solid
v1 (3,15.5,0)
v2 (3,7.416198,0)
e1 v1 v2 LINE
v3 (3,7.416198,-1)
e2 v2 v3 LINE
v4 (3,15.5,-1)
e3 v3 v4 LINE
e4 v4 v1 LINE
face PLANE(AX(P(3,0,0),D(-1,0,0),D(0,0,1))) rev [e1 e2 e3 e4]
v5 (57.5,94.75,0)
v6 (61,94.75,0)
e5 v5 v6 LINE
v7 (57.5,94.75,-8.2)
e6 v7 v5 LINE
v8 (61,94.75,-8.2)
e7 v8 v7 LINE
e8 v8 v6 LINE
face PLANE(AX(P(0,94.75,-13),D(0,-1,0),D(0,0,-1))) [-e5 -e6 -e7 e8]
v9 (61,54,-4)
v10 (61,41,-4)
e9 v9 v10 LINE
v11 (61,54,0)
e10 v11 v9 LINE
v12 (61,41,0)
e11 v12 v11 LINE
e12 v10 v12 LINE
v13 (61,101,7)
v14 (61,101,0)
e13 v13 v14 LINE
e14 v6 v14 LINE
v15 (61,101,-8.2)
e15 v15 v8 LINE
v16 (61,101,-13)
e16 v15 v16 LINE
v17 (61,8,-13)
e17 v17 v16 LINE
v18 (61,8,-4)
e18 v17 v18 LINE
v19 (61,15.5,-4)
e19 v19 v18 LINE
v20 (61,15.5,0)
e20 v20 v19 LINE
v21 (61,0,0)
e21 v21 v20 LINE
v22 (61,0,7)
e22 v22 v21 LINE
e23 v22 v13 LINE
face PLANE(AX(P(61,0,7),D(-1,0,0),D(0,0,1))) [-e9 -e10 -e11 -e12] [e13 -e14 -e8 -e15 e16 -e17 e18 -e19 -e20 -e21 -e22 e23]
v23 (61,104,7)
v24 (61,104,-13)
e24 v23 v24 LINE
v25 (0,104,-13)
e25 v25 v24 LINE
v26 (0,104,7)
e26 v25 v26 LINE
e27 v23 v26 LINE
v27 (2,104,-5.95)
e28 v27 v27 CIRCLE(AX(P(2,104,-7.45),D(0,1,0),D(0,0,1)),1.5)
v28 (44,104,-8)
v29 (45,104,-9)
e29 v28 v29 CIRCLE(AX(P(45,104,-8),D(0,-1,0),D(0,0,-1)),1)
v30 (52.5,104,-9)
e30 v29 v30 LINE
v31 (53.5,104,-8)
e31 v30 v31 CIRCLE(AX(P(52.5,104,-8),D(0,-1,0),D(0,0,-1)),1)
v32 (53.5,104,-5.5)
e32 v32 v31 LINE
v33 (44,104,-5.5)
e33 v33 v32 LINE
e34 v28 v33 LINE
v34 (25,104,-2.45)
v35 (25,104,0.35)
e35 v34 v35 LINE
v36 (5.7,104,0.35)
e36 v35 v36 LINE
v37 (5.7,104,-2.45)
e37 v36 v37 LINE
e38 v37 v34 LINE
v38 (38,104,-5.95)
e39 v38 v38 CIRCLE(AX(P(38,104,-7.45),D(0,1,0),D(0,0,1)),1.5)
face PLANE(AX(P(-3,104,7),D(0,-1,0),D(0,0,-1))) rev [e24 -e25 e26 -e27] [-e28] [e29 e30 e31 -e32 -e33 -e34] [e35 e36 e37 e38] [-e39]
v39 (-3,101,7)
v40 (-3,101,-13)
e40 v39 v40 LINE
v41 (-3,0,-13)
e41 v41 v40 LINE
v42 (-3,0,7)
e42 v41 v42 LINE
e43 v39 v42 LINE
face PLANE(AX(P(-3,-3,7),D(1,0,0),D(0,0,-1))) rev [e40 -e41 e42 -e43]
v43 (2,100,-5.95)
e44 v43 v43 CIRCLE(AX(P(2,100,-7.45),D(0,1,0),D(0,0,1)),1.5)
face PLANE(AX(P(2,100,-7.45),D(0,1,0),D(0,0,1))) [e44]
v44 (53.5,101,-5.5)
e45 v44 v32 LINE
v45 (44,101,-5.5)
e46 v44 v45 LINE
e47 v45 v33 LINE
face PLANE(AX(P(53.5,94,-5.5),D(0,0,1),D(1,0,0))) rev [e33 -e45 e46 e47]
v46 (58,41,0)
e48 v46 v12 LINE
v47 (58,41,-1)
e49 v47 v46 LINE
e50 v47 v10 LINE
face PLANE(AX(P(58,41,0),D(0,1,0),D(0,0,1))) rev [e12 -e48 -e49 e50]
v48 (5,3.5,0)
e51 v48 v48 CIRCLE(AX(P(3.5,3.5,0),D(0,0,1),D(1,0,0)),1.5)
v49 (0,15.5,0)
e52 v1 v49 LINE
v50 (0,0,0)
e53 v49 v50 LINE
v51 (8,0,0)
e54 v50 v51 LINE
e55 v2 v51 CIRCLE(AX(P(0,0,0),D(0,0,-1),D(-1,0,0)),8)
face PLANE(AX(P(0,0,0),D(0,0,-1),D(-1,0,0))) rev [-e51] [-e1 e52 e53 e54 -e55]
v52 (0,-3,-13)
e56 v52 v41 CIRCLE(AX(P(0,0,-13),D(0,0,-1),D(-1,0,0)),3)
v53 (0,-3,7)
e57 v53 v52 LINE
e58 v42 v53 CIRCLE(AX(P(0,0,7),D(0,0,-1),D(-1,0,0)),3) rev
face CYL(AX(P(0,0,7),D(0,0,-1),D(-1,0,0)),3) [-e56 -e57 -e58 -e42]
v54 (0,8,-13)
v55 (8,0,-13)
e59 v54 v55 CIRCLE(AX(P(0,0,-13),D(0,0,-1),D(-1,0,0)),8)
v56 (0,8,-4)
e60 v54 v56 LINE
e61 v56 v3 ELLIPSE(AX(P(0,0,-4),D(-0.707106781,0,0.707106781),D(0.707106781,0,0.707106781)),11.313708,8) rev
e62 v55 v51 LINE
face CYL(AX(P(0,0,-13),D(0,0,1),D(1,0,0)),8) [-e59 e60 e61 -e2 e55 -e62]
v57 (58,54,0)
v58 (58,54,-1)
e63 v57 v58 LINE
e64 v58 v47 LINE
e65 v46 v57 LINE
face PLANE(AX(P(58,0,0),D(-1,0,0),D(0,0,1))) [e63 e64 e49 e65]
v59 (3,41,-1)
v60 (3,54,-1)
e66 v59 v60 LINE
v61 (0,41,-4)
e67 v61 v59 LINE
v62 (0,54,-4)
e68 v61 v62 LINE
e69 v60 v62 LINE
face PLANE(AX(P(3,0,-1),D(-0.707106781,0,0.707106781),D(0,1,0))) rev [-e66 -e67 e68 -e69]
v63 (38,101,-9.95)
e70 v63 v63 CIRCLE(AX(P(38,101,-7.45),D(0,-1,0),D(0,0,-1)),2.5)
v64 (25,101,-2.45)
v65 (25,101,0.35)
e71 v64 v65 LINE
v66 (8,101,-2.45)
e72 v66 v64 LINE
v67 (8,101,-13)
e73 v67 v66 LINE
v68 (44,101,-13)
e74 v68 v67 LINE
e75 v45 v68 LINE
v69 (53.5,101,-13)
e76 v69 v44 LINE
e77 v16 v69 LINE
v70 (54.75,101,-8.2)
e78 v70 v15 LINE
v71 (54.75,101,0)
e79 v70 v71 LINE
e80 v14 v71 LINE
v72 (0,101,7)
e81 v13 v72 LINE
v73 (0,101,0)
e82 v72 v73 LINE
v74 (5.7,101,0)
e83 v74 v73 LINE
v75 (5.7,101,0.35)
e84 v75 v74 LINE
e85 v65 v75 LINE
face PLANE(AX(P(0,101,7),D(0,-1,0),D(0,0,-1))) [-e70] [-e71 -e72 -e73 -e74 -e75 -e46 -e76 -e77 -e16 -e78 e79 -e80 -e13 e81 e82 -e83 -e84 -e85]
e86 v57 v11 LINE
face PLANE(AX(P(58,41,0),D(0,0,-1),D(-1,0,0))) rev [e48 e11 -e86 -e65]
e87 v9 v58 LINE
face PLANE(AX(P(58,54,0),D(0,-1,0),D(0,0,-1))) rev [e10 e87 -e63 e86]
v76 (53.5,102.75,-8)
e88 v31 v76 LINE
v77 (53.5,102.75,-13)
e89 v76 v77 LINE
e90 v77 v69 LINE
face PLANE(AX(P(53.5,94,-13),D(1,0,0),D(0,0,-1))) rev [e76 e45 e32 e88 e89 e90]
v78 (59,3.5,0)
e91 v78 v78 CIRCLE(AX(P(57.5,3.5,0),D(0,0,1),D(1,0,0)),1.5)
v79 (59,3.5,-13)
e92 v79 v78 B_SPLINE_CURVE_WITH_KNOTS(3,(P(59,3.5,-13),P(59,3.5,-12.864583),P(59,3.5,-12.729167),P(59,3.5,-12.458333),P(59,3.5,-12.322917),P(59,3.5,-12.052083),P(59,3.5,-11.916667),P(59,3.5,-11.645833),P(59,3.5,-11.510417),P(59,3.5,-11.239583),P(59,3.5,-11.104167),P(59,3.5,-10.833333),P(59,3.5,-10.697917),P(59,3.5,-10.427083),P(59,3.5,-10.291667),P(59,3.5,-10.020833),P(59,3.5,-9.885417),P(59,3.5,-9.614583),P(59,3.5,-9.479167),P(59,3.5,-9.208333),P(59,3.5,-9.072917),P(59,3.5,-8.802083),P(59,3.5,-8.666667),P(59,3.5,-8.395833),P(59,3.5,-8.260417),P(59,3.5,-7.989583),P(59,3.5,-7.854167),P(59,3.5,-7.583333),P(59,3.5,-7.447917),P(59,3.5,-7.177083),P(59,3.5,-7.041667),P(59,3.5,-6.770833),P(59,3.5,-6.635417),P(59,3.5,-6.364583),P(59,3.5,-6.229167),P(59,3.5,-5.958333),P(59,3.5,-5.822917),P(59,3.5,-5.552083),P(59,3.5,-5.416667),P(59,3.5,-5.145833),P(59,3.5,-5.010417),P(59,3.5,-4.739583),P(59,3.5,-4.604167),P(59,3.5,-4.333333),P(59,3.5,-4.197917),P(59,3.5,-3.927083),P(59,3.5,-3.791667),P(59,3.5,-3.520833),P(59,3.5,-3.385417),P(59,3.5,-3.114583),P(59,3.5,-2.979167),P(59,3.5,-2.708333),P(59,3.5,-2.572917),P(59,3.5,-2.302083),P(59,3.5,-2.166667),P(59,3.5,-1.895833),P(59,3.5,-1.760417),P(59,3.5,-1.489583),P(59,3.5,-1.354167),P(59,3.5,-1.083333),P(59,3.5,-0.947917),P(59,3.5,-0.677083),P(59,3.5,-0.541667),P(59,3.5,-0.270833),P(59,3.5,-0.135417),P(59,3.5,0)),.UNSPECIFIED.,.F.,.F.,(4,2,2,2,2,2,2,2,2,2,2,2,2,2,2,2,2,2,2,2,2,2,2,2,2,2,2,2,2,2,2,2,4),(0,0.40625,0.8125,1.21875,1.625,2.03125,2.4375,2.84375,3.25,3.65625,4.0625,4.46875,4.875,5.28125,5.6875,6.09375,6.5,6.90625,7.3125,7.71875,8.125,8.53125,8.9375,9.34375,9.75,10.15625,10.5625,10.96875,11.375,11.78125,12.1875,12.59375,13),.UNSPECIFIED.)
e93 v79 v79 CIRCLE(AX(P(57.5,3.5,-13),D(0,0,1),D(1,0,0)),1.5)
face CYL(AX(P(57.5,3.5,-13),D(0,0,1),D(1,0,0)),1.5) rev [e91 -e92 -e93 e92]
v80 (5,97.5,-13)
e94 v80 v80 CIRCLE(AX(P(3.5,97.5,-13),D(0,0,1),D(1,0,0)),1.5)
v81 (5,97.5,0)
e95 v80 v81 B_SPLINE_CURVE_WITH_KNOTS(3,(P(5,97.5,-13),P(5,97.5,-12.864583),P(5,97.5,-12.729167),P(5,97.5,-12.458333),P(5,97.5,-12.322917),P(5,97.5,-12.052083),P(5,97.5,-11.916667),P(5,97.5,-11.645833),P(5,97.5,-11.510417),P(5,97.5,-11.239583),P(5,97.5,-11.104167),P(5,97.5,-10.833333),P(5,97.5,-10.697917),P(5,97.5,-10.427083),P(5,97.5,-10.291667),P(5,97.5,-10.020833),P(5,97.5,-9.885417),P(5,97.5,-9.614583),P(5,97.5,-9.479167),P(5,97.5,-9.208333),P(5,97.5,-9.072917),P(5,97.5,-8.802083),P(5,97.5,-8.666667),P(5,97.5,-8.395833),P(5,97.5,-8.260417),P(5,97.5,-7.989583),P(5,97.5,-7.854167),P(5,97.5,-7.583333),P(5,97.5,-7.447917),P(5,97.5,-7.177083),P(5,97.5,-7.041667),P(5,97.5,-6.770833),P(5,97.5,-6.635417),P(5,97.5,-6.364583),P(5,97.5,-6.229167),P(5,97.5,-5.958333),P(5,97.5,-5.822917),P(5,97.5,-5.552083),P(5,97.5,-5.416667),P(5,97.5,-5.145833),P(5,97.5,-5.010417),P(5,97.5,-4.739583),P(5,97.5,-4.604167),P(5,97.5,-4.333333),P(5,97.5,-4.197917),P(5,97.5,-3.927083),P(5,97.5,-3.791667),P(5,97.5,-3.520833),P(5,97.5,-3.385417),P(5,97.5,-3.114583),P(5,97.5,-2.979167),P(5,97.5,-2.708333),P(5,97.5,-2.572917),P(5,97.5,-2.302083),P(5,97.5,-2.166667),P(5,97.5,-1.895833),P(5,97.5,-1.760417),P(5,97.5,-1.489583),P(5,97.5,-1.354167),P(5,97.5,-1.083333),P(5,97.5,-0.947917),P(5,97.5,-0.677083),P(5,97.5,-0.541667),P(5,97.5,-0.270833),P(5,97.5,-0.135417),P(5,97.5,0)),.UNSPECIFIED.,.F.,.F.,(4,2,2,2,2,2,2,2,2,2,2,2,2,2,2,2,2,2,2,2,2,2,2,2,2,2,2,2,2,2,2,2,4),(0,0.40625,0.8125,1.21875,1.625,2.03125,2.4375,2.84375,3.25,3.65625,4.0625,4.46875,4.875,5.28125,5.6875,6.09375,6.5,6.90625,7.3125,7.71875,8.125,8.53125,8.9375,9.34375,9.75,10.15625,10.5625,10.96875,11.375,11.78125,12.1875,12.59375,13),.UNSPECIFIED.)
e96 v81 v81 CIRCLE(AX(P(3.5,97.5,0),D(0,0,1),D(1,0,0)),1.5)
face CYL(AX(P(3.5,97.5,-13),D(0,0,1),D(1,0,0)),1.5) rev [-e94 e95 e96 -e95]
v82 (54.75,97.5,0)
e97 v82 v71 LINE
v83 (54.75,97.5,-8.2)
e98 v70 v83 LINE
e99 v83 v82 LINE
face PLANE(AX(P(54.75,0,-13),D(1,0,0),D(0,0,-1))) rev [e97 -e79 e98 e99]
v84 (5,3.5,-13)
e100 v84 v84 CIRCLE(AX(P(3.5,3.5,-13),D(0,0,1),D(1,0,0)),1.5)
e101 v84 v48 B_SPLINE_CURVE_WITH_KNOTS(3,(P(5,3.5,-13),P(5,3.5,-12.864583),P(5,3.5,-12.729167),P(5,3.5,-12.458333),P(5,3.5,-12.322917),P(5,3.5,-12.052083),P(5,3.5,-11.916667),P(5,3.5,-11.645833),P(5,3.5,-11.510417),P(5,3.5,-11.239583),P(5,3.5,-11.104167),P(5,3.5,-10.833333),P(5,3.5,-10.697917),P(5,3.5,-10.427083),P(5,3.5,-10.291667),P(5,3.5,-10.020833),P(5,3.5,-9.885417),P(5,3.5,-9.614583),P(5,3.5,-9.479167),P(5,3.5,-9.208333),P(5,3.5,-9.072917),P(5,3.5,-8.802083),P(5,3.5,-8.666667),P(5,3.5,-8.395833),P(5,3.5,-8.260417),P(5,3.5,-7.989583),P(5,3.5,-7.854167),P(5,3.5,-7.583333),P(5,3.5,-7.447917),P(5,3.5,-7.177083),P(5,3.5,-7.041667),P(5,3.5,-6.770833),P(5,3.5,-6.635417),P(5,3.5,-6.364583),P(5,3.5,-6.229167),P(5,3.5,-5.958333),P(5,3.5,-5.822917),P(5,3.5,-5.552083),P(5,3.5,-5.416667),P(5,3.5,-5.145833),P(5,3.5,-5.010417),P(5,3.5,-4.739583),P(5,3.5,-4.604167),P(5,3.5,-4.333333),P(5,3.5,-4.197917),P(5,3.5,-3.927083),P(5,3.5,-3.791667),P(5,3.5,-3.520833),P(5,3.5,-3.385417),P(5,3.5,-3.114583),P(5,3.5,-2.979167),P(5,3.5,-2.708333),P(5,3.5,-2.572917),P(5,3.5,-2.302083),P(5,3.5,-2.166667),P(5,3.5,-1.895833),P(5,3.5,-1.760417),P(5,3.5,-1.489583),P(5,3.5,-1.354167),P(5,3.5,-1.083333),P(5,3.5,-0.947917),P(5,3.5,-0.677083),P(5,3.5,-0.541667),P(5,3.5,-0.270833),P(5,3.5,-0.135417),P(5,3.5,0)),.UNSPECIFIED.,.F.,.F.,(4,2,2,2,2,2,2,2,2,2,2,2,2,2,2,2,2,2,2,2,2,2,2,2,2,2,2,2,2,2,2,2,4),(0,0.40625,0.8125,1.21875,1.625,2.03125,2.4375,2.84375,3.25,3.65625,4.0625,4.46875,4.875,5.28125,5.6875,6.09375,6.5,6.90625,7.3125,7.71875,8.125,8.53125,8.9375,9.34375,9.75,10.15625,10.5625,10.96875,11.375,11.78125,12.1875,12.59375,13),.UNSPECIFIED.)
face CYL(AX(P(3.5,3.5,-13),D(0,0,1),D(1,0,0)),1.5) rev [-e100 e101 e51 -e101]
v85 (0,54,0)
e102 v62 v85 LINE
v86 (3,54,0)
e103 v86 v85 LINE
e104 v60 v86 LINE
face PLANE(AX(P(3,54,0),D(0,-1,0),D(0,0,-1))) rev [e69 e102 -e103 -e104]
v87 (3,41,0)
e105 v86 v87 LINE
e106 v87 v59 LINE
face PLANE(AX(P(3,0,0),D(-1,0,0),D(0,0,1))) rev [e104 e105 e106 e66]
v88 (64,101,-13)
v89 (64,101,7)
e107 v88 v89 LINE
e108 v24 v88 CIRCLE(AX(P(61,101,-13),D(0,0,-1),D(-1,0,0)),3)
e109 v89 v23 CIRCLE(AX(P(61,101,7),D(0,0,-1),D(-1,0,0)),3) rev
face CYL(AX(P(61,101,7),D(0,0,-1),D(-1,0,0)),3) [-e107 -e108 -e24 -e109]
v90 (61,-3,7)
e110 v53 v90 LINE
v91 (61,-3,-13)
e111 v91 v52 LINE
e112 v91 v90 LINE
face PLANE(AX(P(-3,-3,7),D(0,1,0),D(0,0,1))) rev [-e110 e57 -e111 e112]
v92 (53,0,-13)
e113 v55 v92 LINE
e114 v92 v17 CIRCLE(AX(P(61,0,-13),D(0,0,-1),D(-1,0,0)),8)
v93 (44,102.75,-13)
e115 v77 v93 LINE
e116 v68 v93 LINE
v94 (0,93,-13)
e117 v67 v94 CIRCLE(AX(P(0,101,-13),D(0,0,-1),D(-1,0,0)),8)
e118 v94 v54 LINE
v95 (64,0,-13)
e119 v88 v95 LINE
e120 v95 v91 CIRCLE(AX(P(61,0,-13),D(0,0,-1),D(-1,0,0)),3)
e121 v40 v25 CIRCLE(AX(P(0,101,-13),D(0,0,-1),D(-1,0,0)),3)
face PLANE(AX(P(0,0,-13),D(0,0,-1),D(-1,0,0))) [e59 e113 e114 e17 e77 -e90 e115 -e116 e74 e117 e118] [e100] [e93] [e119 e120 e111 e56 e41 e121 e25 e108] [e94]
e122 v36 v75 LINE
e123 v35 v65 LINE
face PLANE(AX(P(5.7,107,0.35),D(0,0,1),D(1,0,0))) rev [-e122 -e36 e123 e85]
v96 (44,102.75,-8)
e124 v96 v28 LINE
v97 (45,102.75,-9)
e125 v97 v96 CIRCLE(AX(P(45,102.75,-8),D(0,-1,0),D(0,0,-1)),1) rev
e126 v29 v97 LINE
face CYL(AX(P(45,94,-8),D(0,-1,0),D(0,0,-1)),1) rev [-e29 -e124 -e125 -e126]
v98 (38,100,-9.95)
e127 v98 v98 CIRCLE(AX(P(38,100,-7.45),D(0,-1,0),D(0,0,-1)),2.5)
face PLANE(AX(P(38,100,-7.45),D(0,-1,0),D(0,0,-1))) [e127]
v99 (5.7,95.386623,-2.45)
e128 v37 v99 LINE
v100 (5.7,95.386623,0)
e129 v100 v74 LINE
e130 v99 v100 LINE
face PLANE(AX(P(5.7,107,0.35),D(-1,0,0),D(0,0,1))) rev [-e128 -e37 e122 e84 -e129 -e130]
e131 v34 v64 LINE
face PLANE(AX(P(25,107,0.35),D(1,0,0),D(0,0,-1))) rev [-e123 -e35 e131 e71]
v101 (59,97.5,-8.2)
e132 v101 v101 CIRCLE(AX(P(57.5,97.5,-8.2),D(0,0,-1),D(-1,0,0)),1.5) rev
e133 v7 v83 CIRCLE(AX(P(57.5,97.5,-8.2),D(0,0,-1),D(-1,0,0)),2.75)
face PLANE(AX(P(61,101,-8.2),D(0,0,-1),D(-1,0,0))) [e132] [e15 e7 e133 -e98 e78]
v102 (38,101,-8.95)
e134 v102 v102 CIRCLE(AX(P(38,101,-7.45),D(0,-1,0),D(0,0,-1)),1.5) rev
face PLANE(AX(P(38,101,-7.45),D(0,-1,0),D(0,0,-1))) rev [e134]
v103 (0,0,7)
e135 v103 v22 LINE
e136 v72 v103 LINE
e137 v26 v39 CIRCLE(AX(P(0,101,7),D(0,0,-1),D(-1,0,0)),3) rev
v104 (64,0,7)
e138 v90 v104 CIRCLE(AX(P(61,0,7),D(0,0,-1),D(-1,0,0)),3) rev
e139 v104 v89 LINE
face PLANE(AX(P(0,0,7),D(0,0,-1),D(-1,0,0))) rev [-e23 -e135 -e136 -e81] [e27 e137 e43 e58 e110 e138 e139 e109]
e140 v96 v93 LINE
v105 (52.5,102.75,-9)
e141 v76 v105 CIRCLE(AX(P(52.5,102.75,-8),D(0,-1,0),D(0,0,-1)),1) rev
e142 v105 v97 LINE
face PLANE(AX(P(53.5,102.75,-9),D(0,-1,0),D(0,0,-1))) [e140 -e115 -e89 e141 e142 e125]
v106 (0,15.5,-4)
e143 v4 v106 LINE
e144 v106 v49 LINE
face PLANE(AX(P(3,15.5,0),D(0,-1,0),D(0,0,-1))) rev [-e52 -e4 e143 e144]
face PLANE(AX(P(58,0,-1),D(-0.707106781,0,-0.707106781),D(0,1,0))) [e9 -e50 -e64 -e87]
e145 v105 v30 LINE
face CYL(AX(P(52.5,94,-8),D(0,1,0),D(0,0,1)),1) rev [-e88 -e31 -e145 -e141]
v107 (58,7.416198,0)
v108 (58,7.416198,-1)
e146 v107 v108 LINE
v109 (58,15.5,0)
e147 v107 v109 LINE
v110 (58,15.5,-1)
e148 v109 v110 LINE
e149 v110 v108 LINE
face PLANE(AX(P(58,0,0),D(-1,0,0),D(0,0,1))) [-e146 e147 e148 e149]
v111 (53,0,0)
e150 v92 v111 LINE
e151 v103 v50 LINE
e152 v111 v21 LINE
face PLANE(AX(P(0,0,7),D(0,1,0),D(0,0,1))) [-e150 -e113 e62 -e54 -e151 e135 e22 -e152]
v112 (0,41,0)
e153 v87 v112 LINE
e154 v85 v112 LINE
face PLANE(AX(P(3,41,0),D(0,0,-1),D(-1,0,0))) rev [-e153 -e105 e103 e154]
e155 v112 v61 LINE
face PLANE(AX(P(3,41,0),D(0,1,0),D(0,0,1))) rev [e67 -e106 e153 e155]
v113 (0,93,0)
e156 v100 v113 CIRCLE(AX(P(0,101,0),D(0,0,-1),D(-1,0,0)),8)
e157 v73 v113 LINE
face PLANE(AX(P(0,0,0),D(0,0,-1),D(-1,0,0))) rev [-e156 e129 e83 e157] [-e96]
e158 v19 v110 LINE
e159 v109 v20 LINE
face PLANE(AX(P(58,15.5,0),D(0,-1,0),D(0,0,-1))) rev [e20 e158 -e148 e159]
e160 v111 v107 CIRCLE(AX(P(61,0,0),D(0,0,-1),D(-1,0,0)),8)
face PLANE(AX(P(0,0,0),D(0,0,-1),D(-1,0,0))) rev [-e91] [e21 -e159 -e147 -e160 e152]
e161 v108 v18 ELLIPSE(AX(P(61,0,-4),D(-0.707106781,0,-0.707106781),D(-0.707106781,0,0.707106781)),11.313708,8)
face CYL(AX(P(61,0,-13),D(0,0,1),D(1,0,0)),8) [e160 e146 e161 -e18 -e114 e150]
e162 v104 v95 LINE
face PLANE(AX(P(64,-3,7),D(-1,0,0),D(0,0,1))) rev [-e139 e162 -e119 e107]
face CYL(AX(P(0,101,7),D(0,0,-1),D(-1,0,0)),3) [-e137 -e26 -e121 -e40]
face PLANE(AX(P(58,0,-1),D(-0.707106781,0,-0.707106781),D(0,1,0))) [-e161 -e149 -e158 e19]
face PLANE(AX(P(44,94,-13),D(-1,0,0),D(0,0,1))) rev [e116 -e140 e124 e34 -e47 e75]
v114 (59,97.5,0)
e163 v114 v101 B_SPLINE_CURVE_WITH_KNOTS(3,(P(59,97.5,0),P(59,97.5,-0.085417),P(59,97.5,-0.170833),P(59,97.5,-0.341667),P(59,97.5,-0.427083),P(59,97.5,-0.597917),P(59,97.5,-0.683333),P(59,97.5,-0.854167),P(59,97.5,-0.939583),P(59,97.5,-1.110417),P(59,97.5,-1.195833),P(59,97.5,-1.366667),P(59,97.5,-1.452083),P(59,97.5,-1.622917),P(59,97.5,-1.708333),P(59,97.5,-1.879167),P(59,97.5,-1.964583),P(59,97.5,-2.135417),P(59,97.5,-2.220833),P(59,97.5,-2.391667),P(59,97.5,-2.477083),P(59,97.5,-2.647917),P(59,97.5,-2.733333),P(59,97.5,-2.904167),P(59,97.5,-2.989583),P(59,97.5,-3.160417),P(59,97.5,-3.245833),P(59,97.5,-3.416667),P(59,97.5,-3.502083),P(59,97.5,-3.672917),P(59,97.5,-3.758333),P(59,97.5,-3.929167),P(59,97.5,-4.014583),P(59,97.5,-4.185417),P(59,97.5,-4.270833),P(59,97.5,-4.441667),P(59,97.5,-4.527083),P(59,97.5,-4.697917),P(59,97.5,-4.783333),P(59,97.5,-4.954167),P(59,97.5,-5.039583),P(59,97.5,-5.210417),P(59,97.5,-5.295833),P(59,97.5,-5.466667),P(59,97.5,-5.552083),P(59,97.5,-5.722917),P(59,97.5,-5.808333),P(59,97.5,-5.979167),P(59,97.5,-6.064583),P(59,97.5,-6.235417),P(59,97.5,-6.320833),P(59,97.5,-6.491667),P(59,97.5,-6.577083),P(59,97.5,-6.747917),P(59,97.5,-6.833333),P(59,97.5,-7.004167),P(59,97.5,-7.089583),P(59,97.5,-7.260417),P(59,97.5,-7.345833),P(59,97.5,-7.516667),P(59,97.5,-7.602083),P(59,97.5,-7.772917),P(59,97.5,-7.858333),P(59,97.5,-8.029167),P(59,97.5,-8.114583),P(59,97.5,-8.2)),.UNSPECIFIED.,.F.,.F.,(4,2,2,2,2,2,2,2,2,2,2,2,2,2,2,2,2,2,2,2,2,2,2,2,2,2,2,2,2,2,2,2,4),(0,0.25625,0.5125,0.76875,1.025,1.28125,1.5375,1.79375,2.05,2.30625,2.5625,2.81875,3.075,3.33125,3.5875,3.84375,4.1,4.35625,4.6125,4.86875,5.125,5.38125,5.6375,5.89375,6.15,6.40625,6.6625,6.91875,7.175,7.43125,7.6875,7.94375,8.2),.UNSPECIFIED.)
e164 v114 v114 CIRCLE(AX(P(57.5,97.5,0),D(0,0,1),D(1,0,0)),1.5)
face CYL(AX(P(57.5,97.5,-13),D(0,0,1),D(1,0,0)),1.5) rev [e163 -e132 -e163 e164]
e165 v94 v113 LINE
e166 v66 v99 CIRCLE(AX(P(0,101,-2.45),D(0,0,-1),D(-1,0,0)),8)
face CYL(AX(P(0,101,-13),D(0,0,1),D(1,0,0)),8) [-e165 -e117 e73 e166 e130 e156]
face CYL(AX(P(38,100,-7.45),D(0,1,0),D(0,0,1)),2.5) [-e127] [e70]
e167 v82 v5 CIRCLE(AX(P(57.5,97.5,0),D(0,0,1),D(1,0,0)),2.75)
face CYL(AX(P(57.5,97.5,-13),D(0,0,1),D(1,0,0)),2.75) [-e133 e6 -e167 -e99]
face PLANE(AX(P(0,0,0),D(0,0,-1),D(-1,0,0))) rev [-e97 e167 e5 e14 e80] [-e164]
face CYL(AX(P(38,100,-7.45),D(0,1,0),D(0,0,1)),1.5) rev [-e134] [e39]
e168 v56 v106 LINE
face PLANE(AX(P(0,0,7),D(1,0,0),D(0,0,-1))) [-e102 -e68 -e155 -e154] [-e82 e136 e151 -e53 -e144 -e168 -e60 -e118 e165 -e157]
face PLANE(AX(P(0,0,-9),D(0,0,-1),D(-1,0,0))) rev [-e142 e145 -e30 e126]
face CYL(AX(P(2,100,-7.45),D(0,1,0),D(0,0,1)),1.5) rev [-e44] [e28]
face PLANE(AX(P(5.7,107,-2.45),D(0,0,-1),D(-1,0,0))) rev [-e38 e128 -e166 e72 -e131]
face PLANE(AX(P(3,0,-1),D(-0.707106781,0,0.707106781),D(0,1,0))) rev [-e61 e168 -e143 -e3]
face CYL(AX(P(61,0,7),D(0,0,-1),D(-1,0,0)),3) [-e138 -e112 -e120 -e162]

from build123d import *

# Parameters (mm, degrees)
SKICA1_W                 = 67
SKICA1_H                 = 107
SKICA1_W_2               = 61
SKICA1_H_2               = 101
P_IDAT_VYSUNUT_M1_DEPTH  = 7
P_IDAT_VYSUNUT_M2_DEPTH  = 13
SKICA3_R                 = 1.5
ODEBRAT_VYSUNUT_M1_DEPTH = 13
ODEBRAT_START            = -4.8
ODEBRAT_VYSUNUT_M2_DEPTH = 4.8
ODEBRAT_VYSUNUT_M4_DEPTH = 123.804723036
ZAOBLIT1_R               = 3
SKICA5_W                 = 4
SKICA5_H                 = 8.5
SKICA5_H_2               = 13
P_IDAT_VYSUNUT_M3_DEPTH  = 3
ZKOSEN_1_SIZE            = 3
SKICA6_W                 = 4
SKICA6_H                 = 8.5
SKICA6_H_2               = 13
P_IDAT_VYSUNUT_M4_DEPTH  = 3
ZKOSEN_2_SIZE            = 3
SKICA7_W                 = 9.5
SKICA7_H                 = 7.5
ODEBRAT_VYSUNUT_M3_DEPTH = 10
SKICA9_W                 = 9.5
SKICA9_H                 = 1.25
P_IDAT_VYSUNUT_M5_DEPTH  = 4
ZAOBLIT2_R               = 1
SKICA10_W                = 19.3
SKICA10_H                = 2.8
ODEBRAT_VYSUNUT_M5_DEPTH = 6
SKICA11_R                = 1.5
ODEBRAT_VYSUNUT_M6_DEPTH = 4
SKICA13_R                = 2.5
P_IDAT_VYSUNUT_M6_DEPTH  = 1


with BuildPart() as part:
    # Skica1 → Přidat vysunutím1 (new body)
    with BuildSketch(Plane.XY):
        with Locations((30.5, 50.5)):
            Rectangle(SKICA1_W, SKICA1_H)
        with Locations((30.5, 50.5)):
            Rectangle(SKICA1_W_2, SKICA1_H_2, mode=Mode.SUBTRACT)
    extrude(amount=P_IDAT_VYSUNUT_M1_DEPTH)

    # Skica2 → Přidat vysunutím2 (add)
    with BuildSketch(Plane(origin=(0, 0, 0), x_dir=(-1, 0, 0), z_dir=(0, 0, -1))):
        with BuildLine():
            ThreePointArc((-53, 0), (-53.14730658, -1.5281381), (-53.583801513, -3))
            Line((-53.583801513, -3), (-7.416198487, -3))
            ThreePointArc((-7.416198487, -3), (-7.85269342, -1.5281381), (-8, 0))
            Line((-8, 0), (-53, 0))
        make_face()
        with BuildLine():
            ThreePointArc((-61, 8), (-62.5281381, 7.85269342), (-64, 7.416198487))
            Line((-64, 7.416198487), (-64, -3))
            Line((-64, -3), (-53.583801513, -3))
            ThreePointArc((-53.583801513, -3), (-53.14730658, -1.5281381), (-53, 0))
            Line((-53, 0), (-61, 0))
            Line((-61, 0), (-61, 8))
        make_face()
        with BuildLine():
            ThreePointArc((-53, 0), (-55.343145751, 5.656854249), (-61, 8))
            Line((-61, 8), (-61, 0))
            Line((-61, 0), (-53, 0))
        make_face()
        with BuildLine():
            ThreePointArc((-61, 93), (-62.5281381, 93.14730658), (-64, 93.583801513))
            Line((-64, 93.583801513), (-64, 7.416198487))
            ThreePointArc((-64, 7.416198487), (-62.5281381, 7.85269342), (-61, 8))
            Line((-61, 8), (-61, 93))
        make_face()
        with BuildLine():
            Line((-53.583801513, 104), (-64, 104))
            Line((-64, 104), (-64, 93.583801513))
            ThreePointArc((-64, 93.583801513), (-62.5281381, 93.14730658), (-61, 93))
            Line((-61, 93), (-61, 101))
            Line((-61, 101), (-53, 101))
            ThreePointArc((-53, 101), (-53.14730658, 102.5281381), (-53.583801513, 104))
        make_face()
        with BuildLine():
            ThreePointArc((-61, 93), (-55.343145751, 95.343145751), (-53, 101))
            Line((-53, 101), (-61, 101))
            Line((-61, 101), (-61, 93))
        make_face()
        with BuildLine():
            Line((-7.416198487, 104), (-53.583801513, 104))
            ThreePointArc((-53.583801513, 104), (-53.14730658, 102.5281381), (-53, 101))
            Line((-53, 101), (-8, 101))
            ThreePointArc((-8, 101), (-7.85269342, 102.5281381), (-7.416198487, 104))
        make_face()
        with BuildLine():
            Line((3, 104), (-7.416198487, 104))
            ThreePointArc((-7.416198487, 104), (-7.85269342, 102.5281381), (-8, 101))
            Line((-8, 101), (0, 101))
            Line((0, 101), (0, 93))
            ThreePointArc((0, 93), (1.5281381, 93.14730658), (3, 93.583801513))
            Line((3, 93.583801513), (3, 104))
        make_face()
        with BuildLine():
            Line((0, 101), (-8, 101))
            ThreePointArc((-8, 101), (-5.656854249, 95.343145751), (0, 93))
            Line((0, 93), (0, 101))
        make_face()
        with BuildLine():
            Line((3, 7.416198487), (3, 93.583801513))
            ThreePointArc((3, 93.583801513), (1.5281381, 93.14730658), (0, 93))
            Line((0, 93), (0, 8))
            ThreePointArc((0, 8), (1.5281381, 7.85269342), (3, 7.416198487))
        make_face()
        with BuildLine():
            Line((3, -3), (3, 7.416198487))
            ThreePointArc((3, 7.416198487), (1.5281381, 7.85269342), (0, 8))
            Line((0, 8), (0, 0))
            Line((0, 0), (-8, 0))
            ThreePointArc((-8, 0), (-7.85269342, -1.5281381), (-7.416198487, -3))
            Line((-7.416198487, -3), (3, -3))
        make_face()
        with BuildLine():
            Line((0, 0), (0, 8))
            ThreePointArc((0, 8), (-5.656854249, 5.656854249), (-8, 0))
            Line((-8, 0), (0, 0))
        make_face()
    extrude(amount=P_IDAT_VYSUNUT_M2_DEPTH)

    # Skica3 → Odebrat vysunutím1 (cut)
    with BuildSketch(Plane.XY):
        with Locations((3.5, 97.5)):
            Circle(SKICA3_R)
        with Locations((3.5, 3.5)):
            Circle(SKICA3_R)
        with Locations((57.5, 3.5)):
            Circle(SKICA3_R)
        with Locations((57.5, 97.5)):
            Circle(SKICA3_R)
    extrude(amount=-ODEBRAT_VYSUNUT_M1_DEPTH, mode=Mode.SUBTRACT)

    # Skica4 → Odebrat vysunutím2 (cut)
    with BuildSketch(Plane(origin=(0, 0, -13), x_dir=(-1, 0, 0), z_dir=(0, 0, -1)).offset(ODEBRAT_START)):
        with BuildLine():
            Line((-53, 101), (-61, 101))
            Line((-61, 101), (-61, 93))
            ThreePointArc((-61, 93), (-55.343145751, 95.343145751), (-53, 101))
        make_face()
    extrude(amount=ODEBRAT_VYSUNUT_M2_DEPTH, mode=Mode.SUBTRACT)

    # Skica8 → Odebrat vysunutím4 (cut, through all)
    with BuildSketch(Plane.XY):
        with BuildLine():
            Line((61, 94.75), (57.5, 94.75))
            ThreePointArc((57.5, 94.75), (55.555456352, 95.555456352), (54.75, 97.5))
            Line((54.75, 97.5), (54.75, 101))
            Line((54.75, 101), (53, 101))
            ThreePointArc((53, 101), (55.343145751, 95.343145751), (61, 93))
            Line((61, 93), (61, 94.75))
        make_face()
    extrude(amount=-ODEBRAT_VYSUNUT_M4_DEPTH, mode=Mode.SUBTRACT)

    # Zaoblit1
    zaoblit1_edges = [part.edges().sort_by_distance(p)[0] for p in [
        (-3, 104, -3),
        (64, 104, -3),
        (64, -3, -3),
        (-3, -3, -3),
    ]]
    fillet(zaoblit1_edges, radius=ZAOBLIT1_R)

    # Skica5 → Přidat vysunutím3 (add)
    with BuildSketch(Plane(origin=(0, 0, 0), x_dir=(0, 0, -1), z_dir=(1, 0, 0))):
        with Locations((2, 11.25)):
            Rectangle(SKICA5_W, SKICA5_H)
        with Locations((2, 47.5)):
            Rectangle(SKICA5_W, SKICA5_H_2)
    extrude(amount=P_IDAT_VYSUNUT_M3_DEPTH)

    # Zkosení1
    zkosen_1_edges = [part.edges().sort_by_distance(p)[0] for p in [
        (3, 11.458099244, -4),
        (3, 47.5, -4),
    ]]
    chamfer(zkosen_1_edges, length=ZKOSEN_1_SIZE - 0.0001)  # a hair under: the kernel refuses the full size

    # Skica6 → Přidat vysunutím4 (add)
    with BuildSketch(Plane.ZY.offset(-61)):
        with Locations((-2, 11.25)):
            Rectangle(SKICA6_W, SKICA6_H)
        with Locations((-2, 47.5)):
            Rectangle(SKICA6_W, SKICA6_H_2)
    extrude(amount=P_IDAT_VYSUNUT_M4_DEPTH)

    # Zkosení2
    zkosen_2_edges = [part.edges().sort_by_distance(p)[0] for p in [
        (58, 11.458099244, -4),
        (58, 47.5, -4),
    ]]
    chamfer(zkosen_2_edges, length=ZKOSEN_2_SIZE - 0.0001)  # a hair under: the kernel refuses the full size

    # Skica7 → Odebrat vysunutím3 (cut)
    with BuildSketch(Plane(origin=(0, 104, 0), x_dir=(1, 0, 0), z_dir=(0, 1, 0))):
        with Locations((48.75, 9.25)):
            Rectangle(SKICA7_W, SKICA7_H)
    extrude(amount=-ODEBRAT_VYSUNUT_M3_DEPTH, mode=Mode.SUBTRACT)

    # Skica9 → Přidat vysunutím5 (add)
    with BuildSketch(Plane(origin=(0, 0, -13), x_dir=(-1, 0, 0), z_dir=(0, 0, -1))):
        with Locations((-48.75, 103.375)):
            Rectangle(SKICA9_W, SKICA9_H)
    extrude(amount=-P_IDAT_VYSUNUT_M5_DEPTH)

    # Zaoblit2
    zaoblit2_edges = [part.edges().sort_by_distance(p)[0] for p in [
        (53.5, 103.375, -9),
        (44, 103.375, -9),
    ]]
    fillet(zaoblit2_edges, radius=ZAOBLIT2_R)

    # Skica10 → Odebrat vysunutím5 (cut, symmetric)
    with BuildSketch(Plane.XZ.offset(-101)):
        with Locations((15.35, -1.05)):
            Rectangle(SKICA10_W, SKICA10_H)
    extrude(amount=ODEBRAT_VYSUNUT_M5_DEPTH, both=True, mode=Mode.SUBTRACT)

    # Skica11 → Odebrat vysunutím6 (cut)
    with BuildSketch(Plane(origin=(0, 104, 0), x_dir=(1, 0, 0), z_dir=(0, 1, 0))):
        with Locations(Location((38, 7.45, 0), (0, 0, 270))):
            Circle(SKICA11_R)
        with Locations(Location((2, 7.45, 0), (0, 0, 270))):
            Circle(SKICA11_R)
    extrude(amount=-ODEBRAT_VYSUNUT_M6_DEPTH, mode=Mode.SUBTRACT)

    # Skica13 → Přidat vysunutím6 (add)
    with BuildSketch(Plane.XZ.offset(-101)):
        with Locations(Location((38, -7.45, 0), (0, 0, 270))):
            Circle(SKICA13_R)
    extrude(amount=P_IDAT_VYSUNUT_M6_DEPTH)


solid = part.part
